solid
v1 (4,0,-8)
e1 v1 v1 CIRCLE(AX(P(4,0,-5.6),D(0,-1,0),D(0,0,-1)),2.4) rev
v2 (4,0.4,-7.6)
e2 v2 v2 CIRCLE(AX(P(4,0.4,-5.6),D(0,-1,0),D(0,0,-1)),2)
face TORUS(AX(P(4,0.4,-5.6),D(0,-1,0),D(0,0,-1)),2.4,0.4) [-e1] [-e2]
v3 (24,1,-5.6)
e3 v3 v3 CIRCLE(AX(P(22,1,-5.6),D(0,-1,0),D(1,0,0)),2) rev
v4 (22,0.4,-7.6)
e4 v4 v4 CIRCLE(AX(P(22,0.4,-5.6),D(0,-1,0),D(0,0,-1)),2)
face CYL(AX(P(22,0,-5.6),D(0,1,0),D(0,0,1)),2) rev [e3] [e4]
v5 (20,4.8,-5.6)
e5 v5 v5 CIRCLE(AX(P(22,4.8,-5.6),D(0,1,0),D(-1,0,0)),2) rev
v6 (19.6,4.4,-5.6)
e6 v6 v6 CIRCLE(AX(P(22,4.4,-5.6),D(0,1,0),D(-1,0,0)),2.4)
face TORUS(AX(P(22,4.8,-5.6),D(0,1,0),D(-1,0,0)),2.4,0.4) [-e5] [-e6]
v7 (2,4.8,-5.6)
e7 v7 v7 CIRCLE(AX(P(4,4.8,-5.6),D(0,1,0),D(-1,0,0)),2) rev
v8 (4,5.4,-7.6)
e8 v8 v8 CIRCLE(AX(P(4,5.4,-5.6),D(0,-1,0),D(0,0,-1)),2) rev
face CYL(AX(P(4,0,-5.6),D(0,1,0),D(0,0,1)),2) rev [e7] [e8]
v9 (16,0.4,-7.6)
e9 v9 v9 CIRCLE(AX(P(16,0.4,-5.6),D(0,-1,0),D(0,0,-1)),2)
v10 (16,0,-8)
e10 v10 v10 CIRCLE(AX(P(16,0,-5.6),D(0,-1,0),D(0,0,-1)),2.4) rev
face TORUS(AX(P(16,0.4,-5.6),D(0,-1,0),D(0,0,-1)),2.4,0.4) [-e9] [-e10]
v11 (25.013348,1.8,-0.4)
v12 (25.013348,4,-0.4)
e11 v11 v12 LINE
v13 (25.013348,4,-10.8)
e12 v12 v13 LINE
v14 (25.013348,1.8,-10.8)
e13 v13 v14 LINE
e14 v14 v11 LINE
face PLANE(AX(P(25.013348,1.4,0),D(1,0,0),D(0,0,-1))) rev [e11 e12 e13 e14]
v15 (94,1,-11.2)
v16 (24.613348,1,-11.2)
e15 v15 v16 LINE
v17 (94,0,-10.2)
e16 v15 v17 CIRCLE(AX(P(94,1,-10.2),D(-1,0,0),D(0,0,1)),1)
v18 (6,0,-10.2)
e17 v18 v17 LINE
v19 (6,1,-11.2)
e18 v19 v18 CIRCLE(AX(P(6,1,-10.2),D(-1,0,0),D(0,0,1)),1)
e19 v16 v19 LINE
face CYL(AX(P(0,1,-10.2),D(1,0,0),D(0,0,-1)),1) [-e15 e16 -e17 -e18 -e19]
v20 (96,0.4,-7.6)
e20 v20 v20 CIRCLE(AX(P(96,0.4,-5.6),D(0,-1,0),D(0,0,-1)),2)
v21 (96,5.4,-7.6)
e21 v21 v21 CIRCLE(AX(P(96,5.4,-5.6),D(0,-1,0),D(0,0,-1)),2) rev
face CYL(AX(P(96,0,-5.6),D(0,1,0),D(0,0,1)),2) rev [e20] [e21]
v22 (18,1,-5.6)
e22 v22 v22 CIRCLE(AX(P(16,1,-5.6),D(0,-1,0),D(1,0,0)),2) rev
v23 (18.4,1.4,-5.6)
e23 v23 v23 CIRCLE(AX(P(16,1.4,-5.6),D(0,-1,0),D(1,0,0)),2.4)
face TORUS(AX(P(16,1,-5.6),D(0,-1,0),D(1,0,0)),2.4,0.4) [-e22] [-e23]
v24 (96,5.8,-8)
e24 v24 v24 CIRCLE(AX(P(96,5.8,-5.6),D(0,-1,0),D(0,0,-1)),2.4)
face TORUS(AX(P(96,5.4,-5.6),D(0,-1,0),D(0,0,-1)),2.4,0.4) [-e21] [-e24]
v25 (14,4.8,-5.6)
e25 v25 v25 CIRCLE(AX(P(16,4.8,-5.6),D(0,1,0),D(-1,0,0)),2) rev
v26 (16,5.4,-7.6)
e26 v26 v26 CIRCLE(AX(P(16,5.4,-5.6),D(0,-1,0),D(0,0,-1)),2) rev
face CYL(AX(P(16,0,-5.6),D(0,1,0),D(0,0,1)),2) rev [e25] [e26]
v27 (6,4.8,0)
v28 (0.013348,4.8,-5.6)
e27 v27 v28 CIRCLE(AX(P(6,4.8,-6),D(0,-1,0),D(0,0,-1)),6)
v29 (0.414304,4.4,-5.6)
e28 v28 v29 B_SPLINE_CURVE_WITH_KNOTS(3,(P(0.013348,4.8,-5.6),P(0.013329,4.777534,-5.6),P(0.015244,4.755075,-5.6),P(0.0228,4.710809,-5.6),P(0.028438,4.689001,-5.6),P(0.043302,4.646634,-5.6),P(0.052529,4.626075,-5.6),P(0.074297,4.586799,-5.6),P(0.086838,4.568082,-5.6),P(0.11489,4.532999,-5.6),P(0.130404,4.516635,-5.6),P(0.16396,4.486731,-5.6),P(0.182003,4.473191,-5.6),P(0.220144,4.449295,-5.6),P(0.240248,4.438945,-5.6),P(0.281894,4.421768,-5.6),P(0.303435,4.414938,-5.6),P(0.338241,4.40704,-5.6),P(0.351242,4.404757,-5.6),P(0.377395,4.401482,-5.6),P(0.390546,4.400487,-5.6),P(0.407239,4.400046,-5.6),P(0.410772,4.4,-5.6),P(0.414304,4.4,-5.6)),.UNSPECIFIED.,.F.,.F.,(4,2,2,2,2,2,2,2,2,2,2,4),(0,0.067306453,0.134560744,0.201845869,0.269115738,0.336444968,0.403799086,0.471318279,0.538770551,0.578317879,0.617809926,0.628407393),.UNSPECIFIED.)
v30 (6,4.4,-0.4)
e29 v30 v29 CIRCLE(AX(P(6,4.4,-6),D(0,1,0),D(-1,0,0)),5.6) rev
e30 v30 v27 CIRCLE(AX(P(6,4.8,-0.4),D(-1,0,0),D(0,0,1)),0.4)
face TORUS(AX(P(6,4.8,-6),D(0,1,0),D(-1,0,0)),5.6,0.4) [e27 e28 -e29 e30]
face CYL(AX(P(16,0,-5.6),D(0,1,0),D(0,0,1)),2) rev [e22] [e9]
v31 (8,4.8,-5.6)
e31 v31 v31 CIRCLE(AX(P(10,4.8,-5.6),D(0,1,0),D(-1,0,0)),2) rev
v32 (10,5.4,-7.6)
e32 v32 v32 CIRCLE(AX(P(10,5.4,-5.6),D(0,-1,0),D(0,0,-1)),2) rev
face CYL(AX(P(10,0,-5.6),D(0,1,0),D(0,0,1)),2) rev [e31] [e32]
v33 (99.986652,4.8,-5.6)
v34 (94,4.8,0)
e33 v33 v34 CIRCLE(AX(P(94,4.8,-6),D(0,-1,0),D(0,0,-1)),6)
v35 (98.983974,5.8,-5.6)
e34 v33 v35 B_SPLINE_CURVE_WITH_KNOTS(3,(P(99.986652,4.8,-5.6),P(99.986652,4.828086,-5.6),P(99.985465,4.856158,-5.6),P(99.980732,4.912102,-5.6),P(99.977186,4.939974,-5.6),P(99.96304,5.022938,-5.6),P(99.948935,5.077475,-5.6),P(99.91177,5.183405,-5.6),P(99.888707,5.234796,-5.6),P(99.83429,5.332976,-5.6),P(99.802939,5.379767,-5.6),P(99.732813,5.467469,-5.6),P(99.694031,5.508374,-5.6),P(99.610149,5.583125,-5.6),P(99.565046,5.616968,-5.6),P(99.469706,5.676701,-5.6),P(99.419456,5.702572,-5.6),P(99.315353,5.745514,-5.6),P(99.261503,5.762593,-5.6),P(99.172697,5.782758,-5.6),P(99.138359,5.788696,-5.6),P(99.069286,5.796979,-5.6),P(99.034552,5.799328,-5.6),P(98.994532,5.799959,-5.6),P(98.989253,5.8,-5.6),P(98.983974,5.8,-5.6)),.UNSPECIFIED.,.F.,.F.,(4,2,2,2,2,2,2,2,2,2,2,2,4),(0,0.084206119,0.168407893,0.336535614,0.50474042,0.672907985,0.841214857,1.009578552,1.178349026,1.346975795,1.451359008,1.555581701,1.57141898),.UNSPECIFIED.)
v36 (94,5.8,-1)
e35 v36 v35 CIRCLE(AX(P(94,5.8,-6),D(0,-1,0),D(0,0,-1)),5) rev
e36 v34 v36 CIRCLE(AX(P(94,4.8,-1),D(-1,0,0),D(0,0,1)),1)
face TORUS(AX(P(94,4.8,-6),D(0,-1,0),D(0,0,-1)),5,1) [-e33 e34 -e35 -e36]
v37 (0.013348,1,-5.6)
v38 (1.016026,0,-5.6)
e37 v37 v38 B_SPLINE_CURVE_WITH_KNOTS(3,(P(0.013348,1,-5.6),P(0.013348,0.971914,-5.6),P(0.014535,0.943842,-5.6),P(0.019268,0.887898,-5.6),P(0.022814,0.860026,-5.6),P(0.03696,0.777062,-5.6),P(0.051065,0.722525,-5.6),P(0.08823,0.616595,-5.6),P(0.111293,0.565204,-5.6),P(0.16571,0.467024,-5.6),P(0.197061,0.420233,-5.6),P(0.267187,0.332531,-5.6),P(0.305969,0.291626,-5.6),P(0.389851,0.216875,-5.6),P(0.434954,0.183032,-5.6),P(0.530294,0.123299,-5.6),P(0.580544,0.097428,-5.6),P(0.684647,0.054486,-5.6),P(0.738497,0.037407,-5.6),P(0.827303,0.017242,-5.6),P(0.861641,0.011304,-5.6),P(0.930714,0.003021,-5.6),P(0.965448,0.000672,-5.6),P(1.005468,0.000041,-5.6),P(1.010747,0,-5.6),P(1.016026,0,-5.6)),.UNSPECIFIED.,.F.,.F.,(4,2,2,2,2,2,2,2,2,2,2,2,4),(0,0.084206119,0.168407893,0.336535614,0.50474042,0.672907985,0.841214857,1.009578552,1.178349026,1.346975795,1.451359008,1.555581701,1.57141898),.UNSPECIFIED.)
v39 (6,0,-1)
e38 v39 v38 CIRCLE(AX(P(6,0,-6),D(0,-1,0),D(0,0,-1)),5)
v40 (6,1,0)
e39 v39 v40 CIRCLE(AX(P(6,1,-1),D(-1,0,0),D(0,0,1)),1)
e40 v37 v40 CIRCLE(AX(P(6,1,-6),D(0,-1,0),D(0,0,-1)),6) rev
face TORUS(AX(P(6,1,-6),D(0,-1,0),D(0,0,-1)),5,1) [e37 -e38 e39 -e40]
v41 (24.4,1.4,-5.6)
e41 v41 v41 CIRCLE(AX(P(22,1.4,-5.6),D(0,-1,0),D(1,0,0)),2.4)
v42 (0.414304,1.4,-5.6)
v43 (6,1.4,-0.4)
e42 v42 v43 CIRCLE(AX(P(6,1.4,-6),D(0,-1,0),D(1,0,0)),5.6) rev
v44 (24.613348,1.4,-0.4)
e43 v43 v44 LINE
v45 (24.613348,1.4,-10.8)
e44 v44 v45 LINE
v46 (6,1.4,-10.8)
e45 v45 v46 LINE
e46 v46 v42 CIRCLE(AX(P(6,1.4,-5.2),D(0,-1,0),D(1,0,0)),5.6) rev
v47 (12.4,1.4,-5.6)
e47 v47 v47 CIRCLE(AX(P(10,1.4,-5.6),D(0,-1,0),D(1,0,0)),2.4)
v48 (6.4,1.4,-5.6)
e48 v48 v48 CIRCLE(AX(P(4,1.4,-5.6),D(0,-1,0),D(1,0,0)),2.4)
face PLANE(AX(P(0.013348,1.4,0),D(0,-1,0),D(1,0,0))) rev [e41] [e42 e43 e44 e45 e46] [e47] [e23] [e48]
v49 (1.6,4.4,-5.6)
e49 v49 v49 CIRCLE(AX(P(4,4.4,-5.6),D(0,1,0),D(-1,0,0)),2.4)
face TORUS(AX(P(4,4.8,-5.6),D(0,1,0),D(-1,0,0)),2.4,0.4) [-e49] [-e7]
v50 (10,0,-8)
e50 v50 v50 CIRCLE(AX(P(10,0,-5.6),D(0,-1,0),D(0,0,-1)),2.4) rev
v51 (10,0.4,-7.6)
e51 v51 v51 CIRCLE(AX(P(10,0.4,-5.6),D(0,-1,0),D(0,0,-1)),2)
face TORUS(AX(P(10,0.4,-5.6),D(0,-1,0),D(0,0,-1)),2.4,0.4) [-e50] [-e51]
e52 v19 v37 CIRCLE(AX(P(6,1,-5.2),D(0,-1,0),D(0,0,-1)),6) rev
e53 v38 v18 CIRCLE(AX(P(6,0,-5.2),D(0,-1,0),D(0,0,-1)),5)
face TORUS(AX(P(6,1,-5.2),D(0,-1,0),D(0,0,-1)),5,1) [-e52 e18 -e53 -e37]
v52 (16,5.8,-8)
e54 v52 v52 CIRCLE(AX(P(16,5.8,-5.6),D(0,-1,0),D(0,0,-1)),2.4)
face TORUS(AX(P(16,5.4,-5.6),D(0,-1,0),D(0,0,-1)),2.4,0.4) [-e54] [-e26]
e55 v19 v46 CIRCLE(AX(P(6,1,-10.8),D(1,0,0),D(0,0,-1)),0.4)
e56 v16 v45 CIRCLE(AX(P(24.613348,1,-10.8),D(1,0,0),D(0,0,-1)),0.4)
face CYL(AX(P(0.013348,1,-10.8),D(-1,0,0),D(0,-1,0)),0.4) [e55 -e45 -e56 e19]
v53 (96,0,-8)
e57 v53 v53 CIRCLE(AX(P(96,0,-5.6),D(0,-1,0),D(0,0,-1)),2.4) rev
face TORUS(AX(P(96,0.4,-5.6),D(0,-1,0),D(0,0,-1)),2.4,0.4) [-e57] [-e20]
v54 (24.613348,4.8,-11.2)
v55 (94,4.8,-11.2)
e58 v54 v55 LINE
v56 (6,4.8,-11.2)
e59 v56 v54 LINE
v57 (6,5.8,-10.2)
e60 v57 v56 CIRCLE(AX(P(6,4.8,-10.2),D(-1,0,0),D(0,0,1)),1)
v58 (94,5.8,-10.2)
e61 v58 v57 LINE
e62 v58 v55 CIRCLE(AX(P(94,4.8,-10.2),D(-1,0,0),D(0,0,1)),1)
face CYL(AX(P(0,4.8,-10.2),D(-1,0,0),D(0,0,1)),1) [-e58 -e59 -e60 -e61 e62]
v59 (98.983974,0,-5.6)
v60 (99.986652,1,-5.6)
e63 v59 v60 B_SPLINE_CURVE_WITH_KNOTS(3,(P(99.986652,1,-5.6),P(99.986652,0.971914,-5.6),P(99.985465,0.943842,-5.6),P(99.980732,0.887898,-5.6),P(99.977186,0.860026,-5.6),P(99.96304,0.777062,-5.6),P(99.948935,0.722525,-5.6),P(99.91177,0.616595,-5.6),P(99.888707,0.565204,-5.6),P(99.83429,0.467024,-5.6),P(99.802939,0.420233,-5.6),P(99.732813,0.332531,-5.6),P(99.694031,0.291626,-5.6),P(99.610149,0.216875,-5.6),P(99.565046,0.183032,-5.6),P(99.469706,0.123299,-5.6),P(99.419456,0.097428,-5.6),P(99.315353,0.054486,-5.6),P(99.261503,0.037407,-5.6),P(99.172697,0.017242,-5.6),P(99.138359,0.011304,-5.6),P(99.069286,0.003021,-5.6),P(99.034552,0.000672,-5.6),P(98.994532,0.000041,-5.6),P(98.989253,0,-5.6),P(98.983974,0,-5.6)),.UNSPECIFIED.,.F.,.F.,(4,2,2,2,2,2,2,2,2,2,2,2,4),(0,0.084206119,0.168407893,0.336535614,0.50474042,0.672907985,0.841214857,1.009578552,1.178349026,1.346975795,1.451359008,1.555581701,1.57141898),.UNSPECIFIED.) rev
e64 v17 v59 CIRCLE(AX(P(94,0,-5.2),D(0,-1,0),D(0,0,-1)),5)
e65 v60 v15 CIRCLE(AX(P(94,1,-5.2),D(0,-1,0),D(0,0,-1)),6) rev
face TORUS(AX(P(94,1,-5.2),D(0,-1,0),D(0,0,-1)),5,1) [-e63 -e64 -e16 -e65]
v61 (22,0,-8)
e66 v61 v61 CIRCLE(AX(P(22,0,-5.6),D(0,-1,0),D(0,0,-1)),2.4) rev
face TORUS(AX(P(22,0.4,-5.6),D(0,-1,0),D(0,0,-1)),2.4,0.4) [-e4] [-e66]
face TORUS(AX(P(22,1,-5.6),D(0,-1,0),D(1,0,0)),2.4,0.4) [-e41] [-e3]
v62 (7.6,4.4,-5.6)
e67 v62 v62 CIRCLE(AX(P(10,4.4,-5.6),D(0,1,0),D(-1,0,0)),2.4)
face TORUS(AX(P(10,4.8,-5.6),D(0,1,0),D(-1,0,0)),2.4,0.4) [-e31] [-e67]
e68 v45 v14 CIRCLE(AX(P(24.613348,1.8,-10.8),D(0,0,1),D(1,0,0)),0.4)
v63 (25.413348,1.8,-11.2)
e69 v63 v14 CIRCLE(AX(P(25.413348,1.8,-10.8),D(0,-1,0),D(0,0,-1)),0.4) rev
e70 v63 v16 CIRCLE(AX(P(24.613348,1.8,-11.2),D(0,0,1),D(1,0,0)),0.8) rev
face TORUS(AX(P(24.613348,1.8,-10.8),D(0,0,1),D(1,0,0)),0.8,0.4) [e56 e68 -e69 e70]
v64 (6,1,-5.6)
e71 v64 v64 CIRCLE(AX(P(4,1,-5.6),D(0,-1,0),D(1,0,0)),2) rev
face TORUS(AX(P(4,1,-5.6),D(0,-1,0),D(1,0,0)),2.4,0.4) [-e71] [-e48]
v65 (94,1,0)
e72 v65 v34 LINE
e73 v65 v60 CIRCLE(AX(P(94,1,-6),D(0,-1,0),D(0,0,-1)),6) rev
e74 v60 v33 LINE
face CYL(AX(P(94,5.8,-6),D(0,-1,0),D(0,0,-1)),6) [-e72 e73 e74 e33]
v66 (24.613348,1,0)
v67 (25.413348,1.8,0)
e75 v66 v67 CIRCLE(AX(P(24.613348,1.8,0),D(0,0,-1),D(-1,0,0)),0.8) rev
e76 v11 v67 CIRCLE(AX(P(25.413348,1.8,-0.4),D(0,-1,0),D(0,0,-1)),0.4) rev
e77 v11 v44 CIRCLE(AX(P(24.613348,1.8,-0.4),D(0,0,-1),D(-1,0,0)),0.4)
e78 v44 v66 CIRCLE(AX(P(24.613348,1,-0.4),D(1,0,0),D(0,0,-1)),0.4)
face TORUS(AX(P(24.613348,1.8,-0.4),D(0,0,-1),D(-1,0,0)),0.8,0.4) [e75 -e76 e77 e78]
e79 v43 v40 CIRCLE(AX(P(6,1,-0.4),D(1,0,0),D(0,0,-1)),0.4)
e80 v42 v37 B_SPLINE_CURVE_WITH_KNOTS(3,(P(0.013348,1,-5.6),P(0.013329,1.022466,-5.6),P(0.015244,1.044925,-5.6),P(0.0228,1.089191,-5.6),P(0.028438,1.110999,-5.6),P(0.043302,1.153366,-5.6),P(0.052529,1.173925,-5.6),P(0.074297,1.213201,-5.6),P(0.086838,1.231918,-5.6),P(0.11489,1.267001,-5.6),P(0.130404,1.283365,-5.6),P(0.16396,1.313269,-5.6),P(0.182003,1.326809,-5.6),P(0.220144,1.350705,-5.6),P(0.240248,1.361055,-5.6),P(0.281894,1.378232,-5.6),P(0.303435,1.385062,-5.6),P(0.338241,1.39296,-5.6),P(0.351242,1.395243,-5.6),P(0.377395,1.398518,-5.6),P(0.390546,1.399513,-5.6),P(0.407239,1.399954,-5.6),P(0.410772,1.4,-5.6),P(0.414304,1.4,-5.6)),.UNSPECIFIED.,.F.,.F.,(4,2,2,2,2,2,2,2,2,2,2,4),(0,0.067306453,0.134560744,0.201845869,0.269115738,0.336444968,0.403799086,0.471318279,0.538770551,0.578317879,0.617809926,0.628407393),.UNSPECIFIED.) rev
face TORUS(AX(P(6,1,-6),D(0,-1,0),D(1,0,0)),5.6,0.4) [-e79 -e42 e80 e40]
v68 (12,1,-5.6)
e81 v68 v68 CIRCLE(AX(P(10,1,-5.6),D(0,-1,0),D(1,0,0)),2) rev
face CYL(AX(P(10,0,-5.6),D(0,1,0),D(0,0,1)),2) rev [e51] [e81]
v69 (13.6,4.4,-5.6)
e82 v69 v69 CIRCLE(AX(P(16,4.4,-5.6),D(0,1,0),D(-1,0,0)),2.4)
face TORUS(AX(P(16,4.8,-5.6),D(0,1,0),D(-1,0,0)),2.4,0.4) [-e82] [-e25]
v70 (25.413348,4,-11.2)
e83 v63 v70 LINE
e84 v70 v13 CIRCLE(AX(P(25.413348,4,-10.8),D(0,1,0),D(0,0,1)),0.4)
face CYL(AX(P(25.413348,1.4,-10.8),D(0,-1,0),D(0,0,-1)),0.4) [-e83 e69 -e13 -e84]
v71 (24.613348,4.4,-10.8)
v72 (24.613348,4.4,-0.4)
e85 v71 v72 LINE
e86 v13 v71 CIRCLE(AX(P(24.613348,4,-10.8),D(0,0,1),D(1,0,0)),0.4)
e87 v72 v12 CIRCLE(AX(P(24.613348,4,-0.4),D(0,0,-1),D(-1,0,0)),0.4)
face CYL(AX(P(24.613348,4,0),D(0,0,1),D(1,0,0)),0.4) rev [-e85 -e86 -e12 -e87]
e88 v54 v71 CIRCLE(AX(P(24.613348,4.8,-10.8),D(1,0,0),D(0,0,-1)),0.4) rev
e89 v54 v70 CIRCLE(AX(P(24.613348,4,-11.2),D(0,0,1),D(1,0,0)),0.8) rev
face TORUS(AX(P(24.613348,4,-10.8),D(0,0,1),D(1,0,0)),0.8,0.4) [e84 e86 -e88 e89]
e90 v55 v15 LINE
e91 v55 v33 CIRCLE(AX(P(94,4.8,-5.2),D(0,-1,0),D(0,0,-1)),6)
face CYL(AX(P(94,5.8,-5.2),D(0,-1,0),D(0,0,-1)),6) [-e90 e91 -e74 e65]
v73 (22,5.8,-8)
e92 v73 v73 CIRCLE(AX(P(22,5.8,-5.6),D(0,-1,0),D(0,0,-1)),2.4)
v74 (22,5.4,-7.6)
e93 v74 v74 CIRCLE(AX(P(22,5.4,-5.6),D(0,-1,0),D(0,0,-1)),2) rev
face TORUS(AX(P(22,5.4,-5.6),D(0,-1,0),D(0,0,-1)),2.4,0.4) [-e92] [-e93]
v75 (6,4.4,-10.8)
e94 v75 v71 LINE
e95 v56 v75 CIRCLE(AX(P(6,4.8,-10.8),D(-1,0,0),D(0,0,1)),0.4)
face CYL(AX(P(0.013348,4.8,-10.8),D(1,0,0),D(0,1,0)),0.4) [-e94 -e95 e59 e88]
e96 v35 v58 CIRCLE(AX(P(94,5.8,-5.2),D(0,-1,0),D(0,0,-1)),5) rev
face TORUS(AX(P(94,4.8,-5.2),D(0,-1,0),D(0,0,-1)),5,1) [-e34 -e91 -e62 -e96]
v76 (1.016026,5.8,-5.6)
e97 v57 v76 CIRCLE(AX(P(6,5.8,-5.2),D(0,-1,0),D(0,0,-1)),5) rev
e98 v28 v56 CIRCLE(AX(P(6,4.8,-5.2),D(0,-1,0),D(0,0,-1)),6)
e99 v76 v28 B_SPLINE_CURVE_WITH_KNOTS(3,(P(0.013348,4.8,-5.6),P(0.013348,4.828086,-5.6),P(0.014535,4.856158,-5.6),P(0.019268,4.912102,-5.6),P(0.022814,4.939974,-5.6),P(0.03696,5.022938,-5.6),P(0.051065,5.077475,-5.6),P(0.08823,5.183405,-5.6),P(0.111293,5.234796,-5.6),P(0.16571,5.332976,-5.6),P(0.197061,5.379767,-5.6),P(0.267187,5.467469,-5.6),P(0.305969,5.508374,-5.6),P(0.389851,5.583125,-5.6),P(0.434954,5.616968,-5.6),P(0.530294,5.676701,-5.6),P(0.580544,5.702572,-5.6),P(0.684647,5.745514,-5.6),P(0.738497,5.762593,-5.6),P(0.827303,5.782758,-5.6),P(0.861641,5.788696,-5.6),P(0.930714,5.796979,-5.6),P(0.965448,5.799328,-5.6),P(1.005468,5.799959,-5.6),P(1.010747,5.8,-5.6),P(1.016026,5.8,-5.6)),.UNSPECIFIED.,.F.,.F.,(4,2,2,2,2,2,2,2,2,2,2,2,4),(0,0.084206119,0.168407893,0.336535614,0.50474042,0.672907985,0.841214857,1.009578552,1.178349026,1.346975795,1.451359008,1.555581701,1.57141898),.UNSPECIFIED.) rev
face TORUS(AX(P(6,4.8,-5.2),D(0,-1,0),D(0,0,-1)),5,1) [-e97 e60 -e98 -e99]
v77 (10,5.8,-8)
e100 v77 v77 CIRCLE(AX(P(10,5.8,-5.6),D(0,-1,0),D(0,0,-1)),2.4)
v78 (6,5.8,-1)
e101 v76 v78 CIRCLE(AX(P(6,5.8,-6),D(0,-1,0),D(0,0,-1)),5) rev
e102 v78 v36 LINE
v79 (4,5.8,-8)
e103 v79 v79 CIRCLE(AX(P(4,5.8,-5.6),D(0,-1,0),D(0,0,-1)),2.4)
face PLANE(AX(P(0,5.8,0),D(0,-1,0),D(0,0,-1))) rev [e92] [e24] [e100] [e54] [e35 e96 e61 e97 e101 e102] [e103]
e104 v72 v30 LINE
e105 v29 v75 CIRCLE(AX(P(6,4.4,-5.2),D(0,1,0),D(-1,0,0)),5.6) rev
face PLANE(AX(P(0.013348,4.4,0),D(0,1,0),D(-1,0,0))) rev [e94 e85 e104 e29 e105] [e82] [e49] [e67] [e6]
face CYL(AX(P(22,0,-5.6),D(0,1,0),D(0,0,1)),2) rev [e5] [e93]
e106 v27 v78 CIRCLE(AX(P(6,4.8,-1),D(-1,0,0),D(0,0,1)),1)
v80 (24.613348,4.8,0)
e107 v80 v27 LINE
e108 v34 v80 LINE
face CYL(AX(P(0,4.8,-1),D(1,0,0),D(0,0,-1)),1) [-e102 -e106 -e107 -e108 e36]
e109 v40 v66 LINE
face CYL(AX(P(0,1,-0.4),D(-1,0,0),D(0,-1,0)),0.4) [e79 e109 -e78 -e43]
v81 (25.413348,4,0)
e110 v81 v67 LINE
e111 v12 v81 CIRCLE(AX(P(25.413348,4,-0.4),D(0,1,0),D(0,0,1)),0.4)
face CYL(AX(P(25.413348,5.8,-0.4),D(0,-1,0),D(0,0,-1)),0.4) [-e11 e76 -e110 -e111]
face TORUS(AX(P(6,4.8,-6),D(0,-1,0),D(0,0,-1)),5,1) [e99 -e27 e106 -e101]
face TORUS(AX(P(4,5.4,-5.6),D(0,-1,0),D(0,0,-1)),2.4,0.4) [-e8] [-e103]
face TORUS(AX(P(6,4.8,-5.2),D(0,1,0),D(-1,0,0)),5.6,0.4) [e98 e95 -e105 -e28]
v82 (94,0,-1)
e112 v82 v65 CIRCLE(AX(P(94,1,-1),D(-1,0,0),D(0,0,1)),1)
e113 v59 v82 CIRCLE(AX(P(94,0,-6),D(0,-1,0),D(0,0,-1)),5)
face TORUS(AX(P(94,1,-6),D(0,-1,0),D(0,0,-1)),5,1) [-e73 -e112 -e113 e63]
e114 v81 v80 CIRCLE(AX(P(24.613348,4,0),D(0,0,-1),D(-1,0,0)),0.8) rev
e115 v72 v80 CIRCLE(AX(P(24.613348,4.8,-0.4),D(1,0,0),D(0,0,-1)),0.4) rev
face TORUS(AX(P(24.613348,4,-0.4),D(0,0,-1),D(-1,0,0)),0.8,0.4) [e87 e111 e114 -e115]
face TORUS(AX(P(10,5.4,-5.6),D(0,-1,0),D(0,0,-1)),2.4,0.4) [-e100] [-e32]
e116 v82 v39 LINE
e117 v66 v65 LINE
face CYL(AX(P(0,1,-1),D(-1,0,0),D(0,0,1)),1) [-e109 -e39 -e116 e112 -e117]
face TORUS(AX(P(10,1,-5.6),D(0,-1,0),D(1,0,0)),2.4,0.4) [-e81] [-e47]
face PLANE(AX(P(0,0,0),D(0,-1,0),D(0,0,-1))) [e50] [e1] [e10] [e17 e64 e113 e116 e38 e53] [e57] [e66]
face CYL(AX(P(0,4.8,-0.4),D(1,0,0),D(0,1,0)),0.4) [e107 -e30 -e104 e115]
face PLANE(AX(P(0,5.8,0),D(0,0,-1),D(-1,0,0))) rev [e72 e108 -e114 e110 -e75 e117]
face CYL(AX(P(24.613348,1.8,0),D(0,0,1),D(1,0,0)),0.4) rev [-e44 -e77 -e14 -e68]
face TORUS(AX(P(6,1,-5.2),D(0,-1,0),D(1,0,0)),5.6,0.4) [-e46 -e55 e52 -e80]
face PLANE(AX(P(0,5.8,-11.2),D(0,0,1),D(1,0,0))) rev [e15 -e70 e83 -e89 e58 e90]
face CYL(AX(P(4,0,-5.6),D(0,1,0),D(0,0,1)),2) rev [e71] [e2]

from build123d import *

# Parameters (mm, degrees)
SKETCH1_W           = 100
SKETCH1_H           = 11.2
BOSS_EXTRUDE1_DEPTH = 5.8
SKETCH2_R           = 2
CUT_EXTRUDE1_DEPTH  = 101.792261608
FILLET1_R           = 6
FILLET2_R           = 1
SKETCH3_W           = 25
SKETCH3_H           = 3
CUT_EXTRUDE2_DEPTH  = 101.779018478
FILLET3_R           = 0.4


with BuildPart() as part:
    # Sketch1 → Boss-Extrude1 (new body)
    with BuildSketch(Plane(origin=(0, 0, 0), x_dir=(1, 0, 0), z_dir=(0, 1, 0))):
        with Locations((50, 5.6)):
            Rectangle(SKETCH1_W, SKETCH1_H)
    extrude(amount=BOSS_EXTRUDE1_DEPTH)

    # Sketch2 → Cut-Extrude1 (cut, through all)
    with BuildSketch(Plane(origin=(0, 5.8, 0), x_dir=(1, 0, 0), z_dir=(0, 1, 0))):
        with Locations(Location((4, 5.6, 0), (0, 0, 270))):
            Circle(SKETCH2_R)
        with Locations(Location((96, 5.6, 0), (0, 0, 270))):
            Circle(SKETCH2_R)
        with Locations(Location((10, 5.6, 0), (0, 0, 270))):
            Circle(SKETCH2_R)
        with Locations(Location((16, 5.6, 0), (0, 0, 270))):
            Circle(SKETCH2_R)
        with Locations(Location((22, 5.6, 0), (0, 0, 270))):
            Circle(SKETCH2_R)
    extrude(amount=-CUT_EXTRUDE1_DEPTH, mode=Mode.SUBTRACT)

    # Fillet1
    # the kernel refuses this fillet: 6 mm, written as the material it takes off along each edge
    with BuildSketch(Plane(origin=(100, -15, 0), x_dir=(-1, 0, 0), z_dir=(0, 1, 0)), Plane(origin=(100, -15, -11.2), x_dir=(0, 0, 1), z_dir=(0, 1, 0))) as fillet1_piece_1:
        with BuildLine():
            CenterArc((FILLET1_R, -FILLET1_R), FILLET1_R, 90, 90)
            Line((0, -FILLET1_R), (0, 0))
            Line((0, 0), (FILLET1_R, 0))
        make_face()
    extrude(amount=35.8, mode=Mode.SUBTRACT)
    with BuildSketch(Plane(origin=(0, -15, -11.2), x_dir=(0, 0, 1), z_dir=(0, 1, 0)), Plane(origin=(0, -15, 0), x_dir=(1, 0, 0), z_dir=(0, 1, 0))) as fillet1_piece_2:
        with BuildLine():
            CenterArc((FILLET1_R, FILLET1_R), FILLET1_R, 180, 90)
            Line((0, FILLET1_R), (0, 0))
            Line((0, 0), (FILLET1_R, 0))
        make_face()
    extrude(amount=35.8, mode=Mode.SUBTRACT)

    # Fillet2
    # the kernel refuses this fillet: 1 mm, written as the material it takes off along each edge
    with BuildSketch(Plane(origin=(94, 0, -11.2), x_dir=(0, 0, 1), z_dir=(-1, 0, 0)), Plane(origin=(6, 5.8, 0), x_dir=(0, -1, 0), z_dir=(1, 0, 0))) as fillet2_piece_1:
        with BuildLine():
            CenterArc((FILLET2_R, FILLET2_R), FILLET2_R, 180, 90)
            Line((0, FILLET2_R), (0, 0))
            Line((0, 0), (FILLET2_R, 0))
        make_face()
    extrude(amount=88, mode=Mode.SUBTRACT)
    with BuildSketch(Plane(origin=(6, 0, 0), x_dir=(0, 1, 0), z_dir=(1, 0, 0)), Plane(origin=(94, 5.8, -11.2), x_dir=(0, 0, 1), z_dir=(-1, 0, 0))) as fillet2_piece_2:
        with BuildLine():
            CenterArc((FILLET2_R, -FILLET2_R), FILLET2_R, 90, 90)
            Line((0, -FILLET2_R), (0, 0))
            Line((0, 0), (FILLET2_R, 0))
        make_face()
    extrude(amount=88, mode=Mode.SUBTRACT)
    with BuildSketch(Plane(origin=(94, 0, -5.2), x_dir=(0, 0, -1), z_dir=(-1, 0, 0))) as fillet2_piece_3:
        with BuildLine():
            CenterArc((6 - FILLET2_R, -FILLET2_R), FILLET2_R, 0, 90)
            Line((6, -FILLET2_R), (6, 0))
            Line((6, 0), (6 - FILLET2_R, 0))
        make_face()
    revolve(axis=Axis((94, 0, -5.2), (0, -1, 0)), revolution_arc=110.05948027, mode=Mode.SUBTRACT)
    with BuildSketch(Plane(origin=(94, 0, -6), x_dir=(0.9393370543039388, 0, -0.3429954787043108), z_dir=(-0.3429954787043108, 0, -0.9393370543039388))) as fillet2_piece_4:
        with BuildLine():
            CenterArc((6 - FILLET2_R, -FILLET2_R), FILLET2_R, 0, 90)
            Line((6, -FILLET2_R), (6, 0))
            Line((6, 0), (6 - FILLET2_R, 0))
        make_face()
    revolve(axis=Axis((94, 0, -6), (0, -1, 0)), revolution_arc=110.05948027, mode=Mode.SUBTRACT)
    with BuildSketch(Plane(origin=(6, 0, -6), x_dir=(0, 0, 1), z_dir=(1, 0, 0))) as fillet2_piece_5:
        with BuildLine():
            CenterArc((6 - FILLET2_R, -FILLET2_R), FILLET2_R, 0, 90)
            Line((6, -FILLET2_R), (6, 0))
            Line((6, 0), (6 - FILLET2_R, 0))
        make_face()
    revolve(axis=Axis((6, 0, -6), (0, -1, 0)), revolution_arc=110.05948027, mode=Mode.SUBTRACT)
    with BuildSketch(Plane(origin=(6, 0, -5.2), x_dir=(-0.9393370543039198, 0, 0.3429954787043625), z_dir=(0.3429954787043625, 0, 0.9393370543039198))) as fillet2_piece_6:
        with BuildLine():
            CenterArc((6 - FILLET2_R, -FILLET2_R), FILLET2_R, 0, 90)
            Line((6, -FILLET2_R), (6, 0))
            Line((6, 0), (6 - FILLET2_R, 0))
        make_face()
    revolve(axis=Axis((6, 0, -5.2), (0, -1, 0)), revolution_arc=110.05948027, mode=Mode.SUBTRACT)
    with BuildSketch(Plane(origin=(94, 5.8, -5.2), x_dir=(0, 0, -1), z_dir=(-1, 0, 0))) as fillet2_piece_7:
        with BuildLine():
            CenterArc((6 - FILLET2_R, FILLET2_R), FILLET2_R, 270, 90)
            Line((6, FILLET2_R), (6, 0))
            Line((6, 0), (6 - FILLET2_R, 0))
        make_face()
    revolve(axis=Axis((94, 5.8, -5.2), (0, -1, 0)), revolution_arc=110.05948027, mode=Mode.SUBTRACT)
    with BuildSketch(Plane(origin=(94, 5.8, -6), x_dir=(0.9393370543039388, 0, -0.3429954787043108), z_dir=(-0.3429954787043108, 0, -0.9393370543039388))) as fillet2_piece_8:
        with BuildLine():
            CenterArc((6 - FILLET2_R, FILLET2_R), FILLET2_R, 270, 90)
            Line((6 - FILLET2_R, 0), (6, 0))
            Line((6, 0), (6, FILLET2_R))
        make_face()
    revolve(axis=Axis((94, 5.8, -6), (0, -1, 0)), revolution_arc=110.05948027, mode=Mode.SUBTRACT)
    with BuildSketch(Plane(origin=(6, 5.8, -6), x_dir=(0, 0, 1), z_dir=(1, 0, 0))) as fillet2_piece_9:
        with BuildLine():
            CenterArc((6 - FILLET2_R, FILLET2_R), FILLET2_R, 270, 90)
            Line((6, FILLET2_R), (6, 0))
            Line((6, 0), (6 - FILLET2_R, 0))
        make_face()
    revolve(axis=Axis((6, 5.8, -6), (0, -1, 0)), revolution_arc=110.05948027, mode=Mode.SUBTRACT)
    with BuildSketch(Plane(origin=(6, 5.8, -5.2), x_dir=(-0.9393370543039198, 0, 0.3429954787043625), z_dir=(0.3429954787043625, 0, 0.9393370543039198))) as fillet2_piece_10:
        with BuildLine():
            CenterArc((6 - FILLET2_R, FILLET2_R), FILLET2_R, 270, 90)
            Line((6, FILLET2_R), (6, 0))
            Line((6, 0), (6 - FILLET2_R, 0))
        make_face()
    revolve(axis=Axis((6, 5.8, -5.2), (0, -1, 0)), revolution_arc=110.05948027, mode=Mode.SUBTRACT)

    # Sketch3 → Cut-Extrude2 (cut, through all)
    with BuildSketch(Plane(origin=(0, 0, -11.2), x_dir=(-1, 0, 0), z_dir=(0, 0, -1))):
        with Locations((-12.513348181, 2.9)):
            Rectangle(SKETCH3_W, SKETCH3_H)
    extrude(amount=-CUT_EXTRUDE2_DEPTH, mode=Mode.SUBTRACT)

    # Fillet3
    # the kernel refuses this fillet: 0.4 mm, written as the material it adds along each edge
    with BuildSketch(Plane(origin=(25.013348181, 4.4, -11.2), x_dir=(-1, 0, 0), z_dir=(0, 0, 1)), Plane(origin=(25.013348181, 1.4, -11.2), x_dir=(0, 1, 0), z_dir=(0, 0, 1))) as fillet3_piece_1:
        with BuildLine():
            CenterArc((FILLET3_R, FILLET3_R), FILLET3_R, 180, 90)
            Line((0, FILLET3_R), (0, 0))
            Line((0, 0), (FILLET3_R, 0))
        make_face()
    extrude(amount=11.2)
    # the kernel refuses this fillet: 0.4 mm, written as the material it takes off along each edge
    with BuildSketch(Plane(origin=(96, 5.8, -5.6), x_dir=(0, 0, 1), z_dir=(-1, 0, 0))) as fillet3_2_piece_1:
        with BuildLine():
            CenterArc((2 + FILLET3_R, -FILLET3_R), FILLET3_R, 90, 90)
            Line((2, -FILLET3_R), (2, 0))
            Line((2, 0), (2 + FILLET3_R, 0))
        make_face()
    revolve(axis=Axis((96, 5.8, -5.6), (0, 1, 0)), mode=Mode.SUBTRACT)
    with BuildSketch(Plane(origin=(96, 0, -5.6), x_dir=(0, 0, 1), z_dir=(-1, 0, 0))) as fillet3_2_piece_2:
        with BuildLine():
            CenterArc((2 + FILLET3_R, FILLET3_R), FILLET3_R, 180, 90)
            Line((2, FILLET3_R), (2, 0))
            Line((2, 0), (2 + FILLET3_R, 0))
        make_face()
    revolve(axis=Axis((96, 0, -5.6), (0, 1, 0)), mode=Mode.SUBTRACT)
    with BuildSketch(Plane(origin=(4, 5.8, -5.6), x_dir=(0, 0, 1), z_dir=(-1, 0, 0))) as fillet3_2_piece_3:
        with BuildLine():
            CenterArc((2 + FILLET3_R, -FILLET3_R), FILLET3_R, 90, 90)
            Line((2, -FILLET3_R), (2, 0))
            Line((2, 0), (2 + FILLET3_R, 0))
        make_face()
    revolve(axis=Axis((4, 5.8, -5.6), (0, 1, 0)), mode=Mode.SUBTRACT)
    with BuildSketch(Plane(origin=(4, 4.4, -5.6), x_dir=(0, 0, 1), z_dir=(-1, 0, 0))) as fillet3_2_piece_4:
        with BuildLine():
            CenterArc((2 + FILLET3_R, FILLET3_R), FILLET3_R, 180, 90)
            Line((2, FILLET3_R), (2, 0))
            Line((2, 0), (2 + FILLET3_R, 0))
        make_face()
    revolve(axis=Axis((4, 4.4, -5.6), (0, 1, 0)), mode=Mode.SUBTRACT)
    with BuildSketch(Plane(origin=(4, 0, -5.6), x_dir=(0, 0, 1), z_dir=(-1, 0, 0))) as fillet3_2_piece_5:
        with BuildLine():
            CenterArc((2 + FILLET3_R, FILLET3_R), FILLET3_R, 180, 90)
            Line((2, FILLET3_R), (2, 0))
            Line((2, 0), (2 + FILLET3_R, 0))
        make_face()
    revolve(axis=Axis((4, 0, -5.6), (0, 1, 0)), mode=Mode.SUBTRACT)
    with BuildSketch(Plane(origin=(4, 1.4, -5.6), x_dir=(0, 0, 1), z_dir=(-1, 0, 0))) as fillet3_2_piece_6:
        with BuildLine():
            CenterArc((2 + FILLET3_R, -FILLET3_R), FILLET3_R, 90, 90)
            Line((2, -FILLET3_R), (2, 0))
            Line((2, 0), (2 + FILLET3_R, 0))
        make_face()
    revolve(axis=Axis((4, 1.4, -5.6), (0, 1, 0)), mode=Mode.SUBTRACT)
    with BuildSketch(Plane(origin=(22, 0, -5.6), x_dir=(0, 0, 1), z_dir=(-1, 0, 0))) as fillet3_2_piece_7:
        with BuildLine():
            CenterArc((2 + FILLET3_R, FILLET3_R), FILLET3_R, 180, 90)
            Line((2, FILLET3_R), (2, 0))
            Line((2, 0), (2 + FILLET3_R, 0))
        make_face()
    revolve(axis=Axis((22, 0, -5.6), (0, 1, 0)), mode=Mode.SUBTRACT)
    with BuildSketch(Plane(origin=(22, 1.4, -5.6), x_dir=(0, 0, 1), z_dir=(-1, 0, 0))) as fillet3_2_piece_8:
        with BuildLine():
            CenterArc((2 + FILLET3_R, -FILLET3_R), FILLET3_R, 90, 90)
            Line((2, -FILLET3_R), (2, 0))
            Line((2, 0), (2 + FILLET3_R, 0))
        make_face()
    revolve(axis=Axis((22, 1.4, -5.6), (0, 1, 0)), mode=Mode.SUBTRACT)
    with BuildSketch(Plane(origin=(22, 5.8, -5.6), x_dir=(0, 0, 1), z_dir=(-1, 0, 0))) as fillet3_2_piece_9:
        with BuildLine():
            CenterArc((2 + FILLET3_R, -FILLET3_R), FILLET3_R, 90, 90)
            Line((2, -FILLET3_R), (2, 0))
            Line((2, 0), (2 + FILLET3_R, 0))
        make_face()
    revolve(axis=Axis((22, 5.8, -5.6), (0, 1, 0)), mode=Mode.SUBTRACT)
    with BuildSketch(Plane(origin=(22, 4.4, -5.6), x_dir=(0, 0, 1), z_dir=(-1, 0, 0))) as fillet3_2_piece_10:
        with BuildLine():
            CenterArc((2 + FILLET3_R, FILLET3_R), FILLET3_R, 180, 90)
            Line((2, FILLET3_R), (2, 0))
            Line((2, 0), (2 + FILLET3_R, 0))
        make_face()
    revolve(axis=Axis((22, 4.4, -5.6), (0, 1, 0)), mode=Mode.SUBTRACT)
    with BuildSketch(Plane(origin=(16, 0, -5.6), x_dir=(0, 0, 1), z_dir=(-1, 0, 0))) as fillet3_2_piece_11:
        with BuildLine():
            CenterArc((2 + FILLET3_R, FILLET3_R), FILLET3_R, 180, 90)
            Line((2, FILLET3_R), (2, 0))
            Line((2, 0), (2 + FILLET3_R, 0))
        make_face()
    revolve(axis=Axis((16, 0, -5.6), (0, 1, 0)), mode=Mode.SUBTRACT)
    with BuildSketch(Plane(origin=(16, 1.4, -5.6), x_dir=(0, 0, 1), z_dir=(-1, 0, 0))) as fillet3_2_piece_12:
        with BuildLine():
            CenterArc((2 + FILLET3_R, -FILLET3_R), FILLET3_R, 90, 90)
            Line((2, -FILLET3_R), (2, 0))
            Line((2, 0), (2 + FILLET3_R, 0))
        make_face()
    revolve(axis=Axis((16, 1.4, -5.6), (0, 1, 0)), mode=Mode.SUBTRACT)
    with BuildSketch(Plane(origin=(16, 5.8, -5.6), x_dir=(0, 0, 1), z_dir=(-1, 0, 0))) as fillet3_2_piece_13:
        with BuildLine():
            CenterArc((2 + FILLET3_R, -FILLET3_R), FILLET3_R, 90, 90)
            Line((2, -FILLET3_R), (2, 0))
            Line((2, 0), (2 + FILLET3_R, 0))
        make_face()
    revolve(axis=Axis((16, 5.8, -5.6), (0, 1, 0)), mode=Mode.SUBTRACT)
    with BuildSketch(Plane(origin=(16, 4.4, -5.6), x_dir=(0, 0, 1), z_dir=(-1, 0, 0))) as fillet3_2_piece_14:
        with BuildLine():
            CenterArc((2 + FILLET3_R, FILLET3_R), FILLET3_R, 180, 90)
            Line((2, FILLET3_R), (2, 0))
            Line((2, 0), (2 + FILLET3_R, 0))
        make_face()
    revolve(axis=Axis((16, 4.4, -5.6), (0, 1, 0)), mode=Mode.SUBTRACT)
    with BuildSketch(Plane(origin=(10, 0, -5.6), x_dir=(0, 0, 1), z_dir=(-1, 0, 0))) as fillet3_2_piece_15:
        with BuildLine():
            CenterArc((2 + FILLET3_R, FILLET3_R), FILLET3_R, 180, 90)
            Line((2, FILLET3_R), (2, 0))
            Line((2, 0), (2 + FILLET3_R, 0))
        make_face()
    revolve(axis=Axis((10, 0, -5.6), (0, 1, 0)), mode=Mode.SUBTRACT)
    with BuildSketch(Plane(origin=(10, 1.4, -5.6), x_dir=(0, 0, 1), z_dir=(-1, 0, 0))) as fillet3_2_piece_16:
        with BuildLine():
            CenterArc((2 + FILLET3_R, -FILLET3_R), FILLET3_R, 90, 90)
            Line((2, -FILLET3_R), (2, 0))
            Line((2, 0), (2 + FILLET3_R, 0))
        make_face()
    revolve(axis=Axis((10, 1.4, -5.6), (0, 1, 0)), mode=Mode.SUBTRACT)
    with BuildSketch(Plane(origin=(10, 5.8, -5.6), x_dir=(0, 0, 1), z_dir=(-1, 0, 0))) as fillet3_2_piece_17:
        with BuildLine():
            CenterArc((2 + FILLET3_R, -FILLET3_R), FILLET3_R, 90, 90)
            Line((2, -FILLET3_R), (2, 0))
            Line((2, 0), (2 + FILLET3_R, 0))
        make_face()
    revolve(axis=Axis((10, 5.8, -5.6), (0, 1, 0)), mode=Mode.SUBTRACT)
    with BuildSketch(Plane(origin=(10, 4.4, -5.6), x_dir=(0, 0, 1), z_dir=(-1, 0, 0))) as fillet3_2_piece_18:
        with BuildLine():
            CenterArc((2 + FILLET3_R, FILLET3_R), FILLET3_R, 180, 90)
            Line((2, FILLET3_R), (2, 0))
            Line((2, 0), (2 + FILLET3_R, 0))
        make_face()
    revolve(axis=Axis((10, 4.4, -5.6), (0, 1, 0)), mode=Mode.SUBTRACT)
    # the kernel refuses this fillet: 0.4 mm, written as the material it takes off along each edge
    with BuildSketch(Plane(origin=(6, 4.4, -6), x_dir=(0, 0, 1), z_dir=(1, 0, 0))) as fillet3_3_piece_1:
        with BuildLine():
            CenterArc((6 - FILLET3_R, -FILLET3_R), FILLET3_R, 0, 90)
            Line((6, -FILLET3_R), (6, 0))
            Line((6, 0), (6 - FILLET3_R, 0))
        make_face()
    revolve(axis=Axis((6, 4.4, -6), (0, -1, 0)), revolution_arc=95.73025987, mode=Mode.SUBTRACT)
    with BuildSketch(Plane(origin=(6, 4.4, -5.2), x_dir=(-0.9950029770170926, 0, 0.09984525891159218), z_dir=(0.09984525891159218, 0, 0.9950029770170926))) as fillet3_3_piece_2:
        with BuildLine():
            CenterArc((6 - FILLET3_R, -FILLET3_R), FILLET3_R, 360, 90)
            Line((6, -FILLET3_R), (6, 0))
            Line((6, 0), (6 - FILLET3_R, 0))
        make_face()
    revolve(axis=Axis((6, 4.4, -5.2), (0, -1, 0)), revolution_arc=95.73025987, mode=Mode.SUBTRACT)
    with BuildSketch(Plane(origin=(6, 1.4, -6), x_dir=(0, 0, 1), z_dir=(1, 0, 0))) as fillet3_3_piece_3:
        with BuildLine():
            CenterArc((6 - FILLET3_R, FILLET3_R), FILLET3_R, 270, 90)
            Line((6 - FILLET3_R, 0), (6, 0))
            Line((6, 0), (6, FILLET3_R))
        make_face()
    revolve(axis=Axis((6, 1.4, -6), (0, -1, 0)), revolution_arc=95.73025987, mode=Mode.SUBTRACT)
    with BuildSketch(Plane(origin=(6, 1.4, -5.2), x_dir=(-0.9950029770170926, 0, 0.0998452589115928), z_dir=(0.0998452589115928, 0, 0.9950029770170926))) as fillet3_3_piece_4:
        with BuildLine():
            CenterArc((6 - FILLET3_R, FILLET3_R), FILLET3_R, 270, 90)
            Line((6, FILLET3_R), (6, 0))
            Line((6, 0), (6 - FILLET3_R, 0))
        make_face()
    revolve(axis=Axis((6, 1.4, -5.2), (0, -1, 0)), revolution_arc=95.73025987, mode=Mode.SUBTRACT)
    with BuildSketch(Plane(origin=(24.613348181, 4.4, 0), x_dir=(0, 1, 0), z_dir=(-1, 0, 0)), Plane(origin=(24.613348181, 4.4, -11.2), x_dir=(0, 0, 1), z_dir=(-1, 0, 0)), Plane(origin=(6, 1.4, 0), x_dir=(0, -1, 0), z_dir=(1, 0, 0)), Plane(origin=(6, 1.4, -11.2), x_dir=(0, 0, 1), z_dir=(1, 0, 0))) as fillet3_3_piece_5:
        with BuildLine():
            CenterArc((FILLET3_R, FILLET3_R), FILLET3_R, 180, 90)
            Line((0, FILLET3_R), (0, 0))
            Line((0, 0), (FILLET3_R, 0))
        make_face()
    extrude(amount=18.613348181, mode=Mode.SUBTRACT)
    with BuildSketch(Plane(origin=(25.013348181, 1.8, 0), x_dir=(1, 0, 0), z_dir=(0, 1, 0)), Plane(origin=(25.013348181, 1.8, -11.2), x_dir=(0, 0, 1), z_dir=(0, 1, 0))) as fillet3_3_piece_6:
        with BuildLine():
            CenterArc((FILLET3_R, FILLET3_R), FILLET3_R, 180, 90)
            Line((0, FILLET3_R), (0, 0))
            Line((0, 0), (FILLET3_R, 0))
        make_face()
    extrude(amount=2.2, mode=Mode.SUBTRACT)
    with BuildSketch(Plane(origin=(24.613348181, 1.8, -11.2), x_dir=(1, 0, 0), z_dir=(0, 1, 0))) as fillet3_3_piece_7:
        with BuildLine():
            CenterArc((0.4 + FILLET3_R, -FILLET3_R), FILLET3_R, 90, 90)
            Line((0.4 + FILLET3_R, 0), (0.4, 0))
            Line((0.4, 0), (0.4, -FILLET3_R))
        make_face()
    revolve(axis=Axis((24.613348181, 1.8, -11.2), (0, 0, -1)), revolution_arc=90, mode=Mode.SUBTRACT)
    with BuildSketch(Plane(origin=(24.613348181, 4, -11.2), x_dir=(0, 1, 0), z_dir=(-1, 0, 0))) as fillet3_3_piece_8:
        with BuildLine():
            CenterArc((0.4 + FILLET3_R, -FILLET3_R), FILLET3_R, 90, 90)
            Line((0.4 + FILLET3_R, 0), (0.4, 0))
            Line((0.4, 0), (0.4, -FILLET3_R))
        make_face()
    revolve(axis=Axis((24.613348181, 4, -11.2), (0, 0, -1)), revolution_arc=90, mode=Mode.SUBTRACT)
    with BuildSketch(Plane(origin=(24.613348181, 1.8, 0), x_dir=(1, 0, 0), z_dir=(0, 1, 0))) as fillet3_3_piece_9:
        with BuildLine():
            CenterArc((0.4 + FILLET3_R, FILLET3_R), FILLET3_R, 180, 90)
            Line((0.4, FILLET3_R), (0.4, 0))
            Line((0.4, 0), (0.4 + FILLET3_R, 0))
        make_face()
    revolve(axis=Axis((24.613348181, 1.8, 0), (0, 0, -1)), revolution_arc=90, mode=Mode.SUBTRACT)
    with BuildSketch(Plane(origin=(24.613348181, 4, 0), x_dir=(0, 1, 0), z_dir=(-1, 0, 0))) as fillet3_3_piece_10:
        with BuildLine():
            CenterArc((0.4 + FILLET3_R, FILLET3_R), FILLET3_R, 180, 90)
            Line((0.4, FILLET3_R), (0.4, 0))
            Line((0.4, 0), (0.4 + FILLET3_R, 0))
        make_face()
    revolve(axis=Axis((24.613348181, 4, 0), (0, 0, -1)), revolution_arc=90, mode=Mode.SUBTRACT)


solid = part.part
